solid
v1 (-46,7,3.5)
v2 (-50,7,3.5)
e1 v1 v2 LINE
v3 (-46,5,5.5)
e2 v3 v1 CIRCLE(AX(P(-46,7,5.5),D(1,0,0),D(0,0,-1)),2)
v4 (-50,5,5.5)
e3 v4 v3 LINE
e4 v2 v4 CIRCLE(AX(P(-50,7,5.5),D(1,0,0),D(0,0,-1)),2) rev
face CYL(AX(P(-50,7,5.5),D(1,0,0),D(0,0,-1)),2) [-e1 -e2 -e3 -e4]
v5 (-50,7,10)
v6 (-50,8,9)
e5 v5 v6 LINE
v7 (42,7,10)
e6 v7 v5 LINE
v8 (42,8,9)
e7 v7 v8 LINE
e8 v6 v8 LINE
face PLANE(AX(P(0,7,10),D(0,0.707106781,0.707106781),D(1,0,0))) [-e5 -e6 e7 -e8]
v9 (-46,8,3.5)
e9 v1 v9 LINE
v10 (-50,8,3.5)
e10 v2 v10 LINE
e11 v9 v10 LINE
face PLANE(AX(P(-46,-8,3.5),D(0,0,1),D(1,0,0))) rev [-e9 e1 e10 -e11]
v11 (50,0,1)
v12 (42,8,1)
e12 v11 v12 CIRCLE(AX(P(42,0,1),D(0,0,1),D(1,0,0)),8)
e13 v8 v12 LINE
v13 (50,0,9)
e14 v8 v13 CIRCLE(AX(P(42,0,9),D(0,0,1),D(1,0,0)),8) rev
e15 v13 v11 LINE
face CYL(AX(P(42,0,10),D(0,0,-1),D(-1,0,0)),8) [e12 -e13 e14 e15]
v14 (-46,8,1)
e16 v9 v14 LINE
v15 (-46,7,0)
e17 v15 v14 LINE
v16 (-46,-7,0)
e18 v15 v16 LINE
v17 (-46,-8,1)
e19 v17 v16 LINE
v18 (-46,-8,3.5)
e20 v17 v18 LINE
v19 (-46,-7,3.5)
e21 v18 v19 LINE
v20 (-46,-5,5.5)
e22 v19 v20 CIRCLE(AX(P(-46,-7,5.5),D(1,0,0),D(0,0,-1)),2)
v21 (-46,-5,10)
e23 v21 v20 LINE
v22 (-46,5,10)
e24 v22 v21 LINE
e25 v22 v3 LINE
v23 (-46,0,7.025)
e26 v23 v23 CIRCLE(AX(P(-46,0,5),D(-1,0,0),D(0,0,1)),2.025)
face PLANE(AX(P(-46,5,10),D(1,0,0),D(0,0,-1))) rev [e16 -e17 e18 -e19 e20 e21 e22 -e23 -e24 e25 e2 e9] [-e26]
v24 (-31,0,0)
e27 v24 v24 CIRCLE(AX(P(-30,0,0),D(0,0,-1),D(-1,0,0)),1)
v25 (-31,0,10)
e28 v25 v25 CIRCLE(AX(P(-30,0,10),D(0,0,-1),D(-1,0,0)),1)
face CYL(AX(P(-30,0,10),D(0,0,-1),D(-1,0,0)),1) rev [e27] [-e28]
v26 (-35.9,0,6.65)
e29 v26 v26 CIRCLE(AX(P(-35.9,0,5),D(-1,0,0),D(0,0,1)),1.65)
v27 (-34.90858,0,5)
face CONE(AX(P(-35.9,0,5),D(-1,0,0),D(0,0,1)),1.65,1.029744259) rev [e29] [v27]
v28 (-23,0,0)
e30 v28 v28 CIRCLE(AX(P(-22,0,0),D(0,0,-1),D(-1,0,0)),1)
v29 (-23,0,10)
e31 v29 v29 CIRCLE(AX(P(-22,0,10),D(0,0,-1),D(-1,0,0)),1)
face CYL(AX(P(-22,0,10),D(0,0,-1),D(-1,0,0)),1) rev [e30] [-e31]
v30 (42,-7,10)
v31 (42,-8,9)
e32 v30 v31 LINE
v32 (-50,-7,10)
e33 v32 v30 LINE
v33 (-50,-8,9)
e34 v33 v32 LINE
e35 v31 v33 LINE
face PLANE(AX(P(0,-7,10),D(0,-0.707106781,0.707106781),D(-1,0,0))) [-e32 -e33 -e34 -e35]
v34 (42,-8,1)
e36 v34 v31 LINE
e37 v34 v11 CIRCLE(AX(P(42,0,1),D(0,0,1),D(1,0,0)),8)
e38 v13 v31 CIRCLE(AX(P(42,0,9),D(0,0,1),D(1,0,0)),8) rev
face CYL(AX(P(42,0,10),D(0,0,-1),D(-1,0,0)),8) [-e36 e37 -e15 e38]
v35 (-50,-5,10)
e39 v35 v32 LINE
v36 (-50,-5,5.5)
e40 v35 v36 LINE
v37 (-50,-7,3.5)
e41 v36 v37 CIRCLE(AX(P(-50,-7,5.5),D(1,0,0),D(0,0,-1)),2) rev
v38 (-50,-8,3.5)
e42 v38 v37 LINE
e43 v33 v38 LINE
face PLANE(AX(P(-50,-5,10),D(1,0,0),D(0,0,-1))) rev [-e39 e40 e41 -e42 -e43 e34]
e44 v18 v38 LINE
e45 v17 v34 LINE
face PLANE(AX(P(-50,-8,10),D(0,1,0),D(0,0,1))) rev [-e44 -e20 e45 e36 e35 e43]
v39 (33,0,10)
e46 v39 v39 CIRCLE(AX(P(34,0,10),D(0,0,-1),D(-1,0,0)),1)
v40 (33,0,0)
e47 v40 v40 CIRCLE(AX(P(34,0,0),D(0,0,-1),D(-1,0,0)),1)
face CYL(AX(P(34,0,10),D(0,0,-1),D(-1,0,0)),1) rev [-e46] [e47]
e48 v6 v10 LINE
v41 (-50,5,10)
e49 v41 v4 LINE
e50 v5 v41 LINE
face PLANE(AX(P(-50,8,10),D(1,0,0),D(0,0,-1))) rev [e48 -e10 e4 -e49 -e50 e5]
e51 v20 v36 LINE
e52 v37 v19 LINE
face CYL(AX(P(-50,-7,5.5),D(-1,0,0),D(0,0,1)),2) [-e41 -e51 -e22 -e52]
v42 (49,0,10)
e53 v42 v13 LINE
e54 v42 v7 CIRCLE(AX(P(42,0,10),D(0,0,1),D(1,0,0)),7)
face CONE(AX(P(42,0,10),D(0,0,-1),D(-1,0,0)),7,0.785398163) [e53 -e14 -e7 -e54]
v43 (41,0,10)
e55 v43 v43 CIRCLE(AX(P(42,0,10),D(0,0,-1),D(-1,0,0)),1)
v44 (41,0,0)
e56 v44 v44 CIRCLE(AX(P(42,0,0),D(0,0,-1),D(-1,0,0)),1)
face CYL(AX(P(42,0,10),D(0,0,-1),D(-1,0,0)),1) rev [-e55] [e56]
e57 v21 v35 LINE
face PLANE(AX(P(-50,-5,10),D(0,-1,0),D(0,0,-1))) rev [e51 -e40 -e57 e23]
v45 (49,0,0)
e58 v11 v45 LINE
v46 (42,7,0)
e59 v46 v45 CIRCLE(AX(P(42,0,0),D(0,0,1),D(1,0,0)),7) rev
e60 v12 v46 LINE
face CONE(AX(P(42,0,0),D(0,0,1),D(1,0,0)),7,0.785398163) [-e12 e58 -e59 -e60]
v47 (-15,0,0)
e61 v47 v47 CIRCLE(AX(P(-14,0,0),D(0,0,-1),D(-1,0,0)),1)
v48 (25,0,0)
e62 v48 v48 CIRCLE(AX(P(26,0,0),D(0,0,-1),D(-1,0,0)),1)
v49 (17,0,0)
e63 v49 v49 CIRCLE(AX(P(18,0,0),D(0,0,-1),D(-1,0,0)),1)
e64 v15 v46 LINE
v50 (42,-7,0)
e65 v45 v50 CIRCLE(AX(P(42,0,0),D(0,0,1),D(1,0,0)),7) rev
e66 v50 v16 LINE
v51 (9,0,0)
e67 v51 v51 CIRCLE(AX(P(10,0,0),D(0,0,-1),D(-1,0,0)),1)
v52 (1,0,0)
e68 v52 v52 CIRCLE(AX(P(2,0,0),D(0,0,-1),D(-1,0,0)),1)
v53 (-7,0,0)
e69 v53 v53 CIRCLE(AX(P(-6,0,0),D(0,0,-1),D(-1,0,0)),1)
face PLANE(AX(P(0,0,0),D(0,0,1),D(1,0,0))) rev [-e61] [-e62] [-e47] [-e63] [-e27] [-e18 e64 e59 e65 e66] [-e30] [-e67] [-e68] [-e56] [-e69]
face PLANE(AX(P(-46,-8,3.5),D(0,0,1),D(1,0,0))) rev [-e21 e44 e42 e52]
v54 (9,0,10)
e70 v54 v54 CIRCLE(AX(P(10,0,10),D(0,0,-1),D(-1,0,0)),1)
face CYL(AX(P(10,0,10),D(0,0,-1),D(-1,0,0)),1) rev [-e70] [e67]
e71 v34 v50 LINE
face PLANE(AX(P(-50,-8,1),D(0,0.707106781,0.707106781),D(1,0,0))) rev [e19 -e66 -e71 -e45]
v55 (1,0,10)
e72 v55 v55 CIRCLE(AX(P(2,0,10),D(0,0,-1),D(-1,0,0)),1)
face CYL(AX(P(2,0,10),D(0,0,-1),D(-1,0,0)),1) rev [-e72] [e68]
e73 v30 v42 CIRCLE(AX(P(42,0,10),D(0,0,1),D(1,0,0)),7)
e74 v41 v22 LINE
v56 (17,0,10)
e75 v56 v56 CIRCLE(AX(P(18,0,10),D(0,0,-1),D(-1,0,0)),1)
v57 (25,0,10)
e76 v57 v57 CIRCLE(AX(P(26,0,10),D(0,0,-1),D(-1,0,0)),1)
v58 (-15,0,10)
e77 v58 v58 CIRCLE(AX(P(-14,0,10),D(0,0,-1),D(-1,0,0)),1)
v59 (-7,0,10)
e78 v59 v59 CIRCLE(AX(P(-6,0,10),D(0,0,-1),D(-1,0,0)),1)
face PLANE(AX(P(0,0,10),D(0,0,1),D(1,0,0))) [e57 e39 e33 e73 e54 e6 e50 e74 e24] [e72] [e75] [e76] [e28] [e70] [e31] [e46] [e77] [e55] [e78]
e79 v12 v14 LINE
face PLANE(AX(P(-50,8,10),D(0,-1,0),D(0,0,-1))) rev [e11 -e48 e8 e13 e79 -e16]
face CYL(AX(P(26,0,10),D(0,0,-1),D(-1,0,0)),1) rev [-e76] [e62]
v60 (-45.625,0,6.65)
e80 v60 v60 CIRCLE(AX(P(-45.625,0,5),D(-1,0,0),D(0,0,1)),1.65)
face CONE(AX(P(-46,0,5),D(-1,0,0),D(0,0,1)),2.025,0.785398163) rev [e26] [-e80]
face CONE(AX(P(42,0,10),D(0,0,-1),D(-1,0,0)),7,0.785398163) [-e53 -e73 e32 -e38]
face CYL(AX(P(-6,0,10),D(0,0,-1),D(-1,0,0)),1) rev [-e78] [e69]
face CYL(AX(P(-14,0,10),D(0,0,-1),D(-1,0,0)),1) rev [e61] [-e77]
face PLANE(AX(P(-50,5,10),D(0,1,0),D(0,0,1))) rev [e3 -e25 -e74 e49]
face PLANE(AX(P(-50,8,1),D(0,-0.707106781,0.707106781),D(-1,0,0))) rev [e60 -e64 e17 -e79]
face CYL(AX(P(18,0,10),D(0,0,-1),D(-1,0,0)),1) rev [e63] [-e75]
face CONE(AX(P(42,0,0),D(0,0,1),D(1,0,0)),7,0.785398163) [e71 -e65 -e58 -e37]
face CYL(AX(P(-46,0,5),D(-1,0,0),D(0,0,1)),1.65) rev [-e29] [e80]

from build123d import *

# Parameters (mm, degrees)
BOSS_EXTRUDE1_DEPTH         = 10
M4_TAPPED_HOLE1_D           = 3.3
M4_TAPPED_HOLE1_DEPTH       = 10.1
M4_TAPPED_HOLE1_CSINK_D     = 4.05
M4_TAPPED_HOLE1_CSINK_ANGLE = 90
M4_TAPPED_HOLE1_TIP         = 0.991420021
FILLET1_R                   = 8
CHAMFER1_SIZE               = 1
SKETCH4_R                   = 1
CUT_EXTRUDE1_DEPTH          = 10
SKETCH6_W                   = 3.5
SKETCH6_H                   = 16
CUT_EXTRUDE3_DEPTH          = 4
FILLET3_R                   = 2


with BuildPart() as part:
    # Sketch1 → Boss-Extrude1 (new body)
    with BuildSketch(Plane.XY):
        Polygon((-50, 8), (50, 8), (50, -8), (-50, -8), (-50, -5), (-46, -5), (-46, 5), (-50, 5), align=None)
    extrude(amount=BOSS_EXTRUDE1_DEPTH)

    # M4 Tapped Hole1
    with Locations(Plane(origin=(-46, 0, 5), x_dir=(0, 0, -1), z_dir=(-1, 0, 0))):
        with Locations((0, 0)):
            CounterSinkHole(M4_TAPPED_HOLE1_D / 2, M4_TAPPED_HOLE1_CSINK_D / 2, depth=M4_TAPPED_HOLE1_DEPTH, counter_sink_angle=M4_TAPPED_HOLE1_CSINK_ANGLE)
            with Locations((0, 0, -(M4_TAPPED_HOLE1_DEPTH + M4_TAPPED_HOLE1_TIP / 2))):  # 118° drill point
                Cone(0, M4_TAPPED_HOLE1_D / 2, M4_TAPPED_HOLE1_TIP, mode=Mode.SUBTRACT)

    # Fillet1
    fillet1_edges = [part.edges().sort_by_distance(p)[0] for p in [
        (50, 8, 5),
        (50, -8, 5),
    ]]
    fillet(fillet1_edges, radius=FILLET1_R - 0.0001)  # a hair under: the kernel refuses the full size

    # Chamfer1
    chamfer1_edges = [part.edges().sort_by_distance(p)[0] for p in [
        (-3.99995, -8, 10),
        (-3.99995, 8, 0),
        (-3.99995, 8, 10),
        (47.656883539, -5.656883539, 0),
        (47.656883539, 5.656883539, 0),
        (47.656883539, -5.656883539, 10),
        (47.656883539, 5.656883539, 10),
        (-3.99995, -8, 0),
    ]]
    chamfer(chamfer1_edges, length=CHAMFER1_SIZE)

    # Sketch4 → Cut-Extrude1 (cut)
    with BuildSketch(Plane(origin=(0, 0, 0), x_dir=(-1, 0, 0), z_dir=(0, 0, -1))):
        with Locations((-42, 0)):
            Circle(SKETCH4_R)
        with Locations((-34, 0)):
            Circle(SKETCH4_R)
        with Locations((-26, 0)):
            Circle(SKETCH4_R)
        with Locations((-18, 0)):
            Circle(SKETCH4_R)
        with Locations((-10, 0)):
            Circle(SKETCH4_R)
        with Locations((-2, 0)):
            Circle(SKETCH4_R)
        with Locations((6, 0)):
            Circle(SKETCH4_R)
        with Locations((14, 0)):
            Circle(SKETCH4_R)
        with Locations((22, 0)):
            Circle(SKETCH4_R)
        with Locations((30, 0)):
            Circle(SKETCH4_R)
    extrude(amount=-CUT_EXTRUDE1_DEPTH, mode=Mode.SUBTRACT)

    # Sketch6 → Cut-Extrude3 (cut)
    with BuildSketch(Plane.ZY.offset(50)):
        with Locations((1.75, 0)):
            Rectangle(SKETCH6_W, SKETCH6_H)
    extrude(amount=-CUT_EXTRUDE3_DEPTH, mode=Mode.SUBTRACT)

    # Fillet3
    fillet3_edges = [part.edges().sort_by_distance(p)[0] for p in [
        (-48, 5, 3.5),
        (-48, -5, 3.5),
    ]]
    fillet(fillet3_edges, radius=FILLET3_R)


solid = part.part
